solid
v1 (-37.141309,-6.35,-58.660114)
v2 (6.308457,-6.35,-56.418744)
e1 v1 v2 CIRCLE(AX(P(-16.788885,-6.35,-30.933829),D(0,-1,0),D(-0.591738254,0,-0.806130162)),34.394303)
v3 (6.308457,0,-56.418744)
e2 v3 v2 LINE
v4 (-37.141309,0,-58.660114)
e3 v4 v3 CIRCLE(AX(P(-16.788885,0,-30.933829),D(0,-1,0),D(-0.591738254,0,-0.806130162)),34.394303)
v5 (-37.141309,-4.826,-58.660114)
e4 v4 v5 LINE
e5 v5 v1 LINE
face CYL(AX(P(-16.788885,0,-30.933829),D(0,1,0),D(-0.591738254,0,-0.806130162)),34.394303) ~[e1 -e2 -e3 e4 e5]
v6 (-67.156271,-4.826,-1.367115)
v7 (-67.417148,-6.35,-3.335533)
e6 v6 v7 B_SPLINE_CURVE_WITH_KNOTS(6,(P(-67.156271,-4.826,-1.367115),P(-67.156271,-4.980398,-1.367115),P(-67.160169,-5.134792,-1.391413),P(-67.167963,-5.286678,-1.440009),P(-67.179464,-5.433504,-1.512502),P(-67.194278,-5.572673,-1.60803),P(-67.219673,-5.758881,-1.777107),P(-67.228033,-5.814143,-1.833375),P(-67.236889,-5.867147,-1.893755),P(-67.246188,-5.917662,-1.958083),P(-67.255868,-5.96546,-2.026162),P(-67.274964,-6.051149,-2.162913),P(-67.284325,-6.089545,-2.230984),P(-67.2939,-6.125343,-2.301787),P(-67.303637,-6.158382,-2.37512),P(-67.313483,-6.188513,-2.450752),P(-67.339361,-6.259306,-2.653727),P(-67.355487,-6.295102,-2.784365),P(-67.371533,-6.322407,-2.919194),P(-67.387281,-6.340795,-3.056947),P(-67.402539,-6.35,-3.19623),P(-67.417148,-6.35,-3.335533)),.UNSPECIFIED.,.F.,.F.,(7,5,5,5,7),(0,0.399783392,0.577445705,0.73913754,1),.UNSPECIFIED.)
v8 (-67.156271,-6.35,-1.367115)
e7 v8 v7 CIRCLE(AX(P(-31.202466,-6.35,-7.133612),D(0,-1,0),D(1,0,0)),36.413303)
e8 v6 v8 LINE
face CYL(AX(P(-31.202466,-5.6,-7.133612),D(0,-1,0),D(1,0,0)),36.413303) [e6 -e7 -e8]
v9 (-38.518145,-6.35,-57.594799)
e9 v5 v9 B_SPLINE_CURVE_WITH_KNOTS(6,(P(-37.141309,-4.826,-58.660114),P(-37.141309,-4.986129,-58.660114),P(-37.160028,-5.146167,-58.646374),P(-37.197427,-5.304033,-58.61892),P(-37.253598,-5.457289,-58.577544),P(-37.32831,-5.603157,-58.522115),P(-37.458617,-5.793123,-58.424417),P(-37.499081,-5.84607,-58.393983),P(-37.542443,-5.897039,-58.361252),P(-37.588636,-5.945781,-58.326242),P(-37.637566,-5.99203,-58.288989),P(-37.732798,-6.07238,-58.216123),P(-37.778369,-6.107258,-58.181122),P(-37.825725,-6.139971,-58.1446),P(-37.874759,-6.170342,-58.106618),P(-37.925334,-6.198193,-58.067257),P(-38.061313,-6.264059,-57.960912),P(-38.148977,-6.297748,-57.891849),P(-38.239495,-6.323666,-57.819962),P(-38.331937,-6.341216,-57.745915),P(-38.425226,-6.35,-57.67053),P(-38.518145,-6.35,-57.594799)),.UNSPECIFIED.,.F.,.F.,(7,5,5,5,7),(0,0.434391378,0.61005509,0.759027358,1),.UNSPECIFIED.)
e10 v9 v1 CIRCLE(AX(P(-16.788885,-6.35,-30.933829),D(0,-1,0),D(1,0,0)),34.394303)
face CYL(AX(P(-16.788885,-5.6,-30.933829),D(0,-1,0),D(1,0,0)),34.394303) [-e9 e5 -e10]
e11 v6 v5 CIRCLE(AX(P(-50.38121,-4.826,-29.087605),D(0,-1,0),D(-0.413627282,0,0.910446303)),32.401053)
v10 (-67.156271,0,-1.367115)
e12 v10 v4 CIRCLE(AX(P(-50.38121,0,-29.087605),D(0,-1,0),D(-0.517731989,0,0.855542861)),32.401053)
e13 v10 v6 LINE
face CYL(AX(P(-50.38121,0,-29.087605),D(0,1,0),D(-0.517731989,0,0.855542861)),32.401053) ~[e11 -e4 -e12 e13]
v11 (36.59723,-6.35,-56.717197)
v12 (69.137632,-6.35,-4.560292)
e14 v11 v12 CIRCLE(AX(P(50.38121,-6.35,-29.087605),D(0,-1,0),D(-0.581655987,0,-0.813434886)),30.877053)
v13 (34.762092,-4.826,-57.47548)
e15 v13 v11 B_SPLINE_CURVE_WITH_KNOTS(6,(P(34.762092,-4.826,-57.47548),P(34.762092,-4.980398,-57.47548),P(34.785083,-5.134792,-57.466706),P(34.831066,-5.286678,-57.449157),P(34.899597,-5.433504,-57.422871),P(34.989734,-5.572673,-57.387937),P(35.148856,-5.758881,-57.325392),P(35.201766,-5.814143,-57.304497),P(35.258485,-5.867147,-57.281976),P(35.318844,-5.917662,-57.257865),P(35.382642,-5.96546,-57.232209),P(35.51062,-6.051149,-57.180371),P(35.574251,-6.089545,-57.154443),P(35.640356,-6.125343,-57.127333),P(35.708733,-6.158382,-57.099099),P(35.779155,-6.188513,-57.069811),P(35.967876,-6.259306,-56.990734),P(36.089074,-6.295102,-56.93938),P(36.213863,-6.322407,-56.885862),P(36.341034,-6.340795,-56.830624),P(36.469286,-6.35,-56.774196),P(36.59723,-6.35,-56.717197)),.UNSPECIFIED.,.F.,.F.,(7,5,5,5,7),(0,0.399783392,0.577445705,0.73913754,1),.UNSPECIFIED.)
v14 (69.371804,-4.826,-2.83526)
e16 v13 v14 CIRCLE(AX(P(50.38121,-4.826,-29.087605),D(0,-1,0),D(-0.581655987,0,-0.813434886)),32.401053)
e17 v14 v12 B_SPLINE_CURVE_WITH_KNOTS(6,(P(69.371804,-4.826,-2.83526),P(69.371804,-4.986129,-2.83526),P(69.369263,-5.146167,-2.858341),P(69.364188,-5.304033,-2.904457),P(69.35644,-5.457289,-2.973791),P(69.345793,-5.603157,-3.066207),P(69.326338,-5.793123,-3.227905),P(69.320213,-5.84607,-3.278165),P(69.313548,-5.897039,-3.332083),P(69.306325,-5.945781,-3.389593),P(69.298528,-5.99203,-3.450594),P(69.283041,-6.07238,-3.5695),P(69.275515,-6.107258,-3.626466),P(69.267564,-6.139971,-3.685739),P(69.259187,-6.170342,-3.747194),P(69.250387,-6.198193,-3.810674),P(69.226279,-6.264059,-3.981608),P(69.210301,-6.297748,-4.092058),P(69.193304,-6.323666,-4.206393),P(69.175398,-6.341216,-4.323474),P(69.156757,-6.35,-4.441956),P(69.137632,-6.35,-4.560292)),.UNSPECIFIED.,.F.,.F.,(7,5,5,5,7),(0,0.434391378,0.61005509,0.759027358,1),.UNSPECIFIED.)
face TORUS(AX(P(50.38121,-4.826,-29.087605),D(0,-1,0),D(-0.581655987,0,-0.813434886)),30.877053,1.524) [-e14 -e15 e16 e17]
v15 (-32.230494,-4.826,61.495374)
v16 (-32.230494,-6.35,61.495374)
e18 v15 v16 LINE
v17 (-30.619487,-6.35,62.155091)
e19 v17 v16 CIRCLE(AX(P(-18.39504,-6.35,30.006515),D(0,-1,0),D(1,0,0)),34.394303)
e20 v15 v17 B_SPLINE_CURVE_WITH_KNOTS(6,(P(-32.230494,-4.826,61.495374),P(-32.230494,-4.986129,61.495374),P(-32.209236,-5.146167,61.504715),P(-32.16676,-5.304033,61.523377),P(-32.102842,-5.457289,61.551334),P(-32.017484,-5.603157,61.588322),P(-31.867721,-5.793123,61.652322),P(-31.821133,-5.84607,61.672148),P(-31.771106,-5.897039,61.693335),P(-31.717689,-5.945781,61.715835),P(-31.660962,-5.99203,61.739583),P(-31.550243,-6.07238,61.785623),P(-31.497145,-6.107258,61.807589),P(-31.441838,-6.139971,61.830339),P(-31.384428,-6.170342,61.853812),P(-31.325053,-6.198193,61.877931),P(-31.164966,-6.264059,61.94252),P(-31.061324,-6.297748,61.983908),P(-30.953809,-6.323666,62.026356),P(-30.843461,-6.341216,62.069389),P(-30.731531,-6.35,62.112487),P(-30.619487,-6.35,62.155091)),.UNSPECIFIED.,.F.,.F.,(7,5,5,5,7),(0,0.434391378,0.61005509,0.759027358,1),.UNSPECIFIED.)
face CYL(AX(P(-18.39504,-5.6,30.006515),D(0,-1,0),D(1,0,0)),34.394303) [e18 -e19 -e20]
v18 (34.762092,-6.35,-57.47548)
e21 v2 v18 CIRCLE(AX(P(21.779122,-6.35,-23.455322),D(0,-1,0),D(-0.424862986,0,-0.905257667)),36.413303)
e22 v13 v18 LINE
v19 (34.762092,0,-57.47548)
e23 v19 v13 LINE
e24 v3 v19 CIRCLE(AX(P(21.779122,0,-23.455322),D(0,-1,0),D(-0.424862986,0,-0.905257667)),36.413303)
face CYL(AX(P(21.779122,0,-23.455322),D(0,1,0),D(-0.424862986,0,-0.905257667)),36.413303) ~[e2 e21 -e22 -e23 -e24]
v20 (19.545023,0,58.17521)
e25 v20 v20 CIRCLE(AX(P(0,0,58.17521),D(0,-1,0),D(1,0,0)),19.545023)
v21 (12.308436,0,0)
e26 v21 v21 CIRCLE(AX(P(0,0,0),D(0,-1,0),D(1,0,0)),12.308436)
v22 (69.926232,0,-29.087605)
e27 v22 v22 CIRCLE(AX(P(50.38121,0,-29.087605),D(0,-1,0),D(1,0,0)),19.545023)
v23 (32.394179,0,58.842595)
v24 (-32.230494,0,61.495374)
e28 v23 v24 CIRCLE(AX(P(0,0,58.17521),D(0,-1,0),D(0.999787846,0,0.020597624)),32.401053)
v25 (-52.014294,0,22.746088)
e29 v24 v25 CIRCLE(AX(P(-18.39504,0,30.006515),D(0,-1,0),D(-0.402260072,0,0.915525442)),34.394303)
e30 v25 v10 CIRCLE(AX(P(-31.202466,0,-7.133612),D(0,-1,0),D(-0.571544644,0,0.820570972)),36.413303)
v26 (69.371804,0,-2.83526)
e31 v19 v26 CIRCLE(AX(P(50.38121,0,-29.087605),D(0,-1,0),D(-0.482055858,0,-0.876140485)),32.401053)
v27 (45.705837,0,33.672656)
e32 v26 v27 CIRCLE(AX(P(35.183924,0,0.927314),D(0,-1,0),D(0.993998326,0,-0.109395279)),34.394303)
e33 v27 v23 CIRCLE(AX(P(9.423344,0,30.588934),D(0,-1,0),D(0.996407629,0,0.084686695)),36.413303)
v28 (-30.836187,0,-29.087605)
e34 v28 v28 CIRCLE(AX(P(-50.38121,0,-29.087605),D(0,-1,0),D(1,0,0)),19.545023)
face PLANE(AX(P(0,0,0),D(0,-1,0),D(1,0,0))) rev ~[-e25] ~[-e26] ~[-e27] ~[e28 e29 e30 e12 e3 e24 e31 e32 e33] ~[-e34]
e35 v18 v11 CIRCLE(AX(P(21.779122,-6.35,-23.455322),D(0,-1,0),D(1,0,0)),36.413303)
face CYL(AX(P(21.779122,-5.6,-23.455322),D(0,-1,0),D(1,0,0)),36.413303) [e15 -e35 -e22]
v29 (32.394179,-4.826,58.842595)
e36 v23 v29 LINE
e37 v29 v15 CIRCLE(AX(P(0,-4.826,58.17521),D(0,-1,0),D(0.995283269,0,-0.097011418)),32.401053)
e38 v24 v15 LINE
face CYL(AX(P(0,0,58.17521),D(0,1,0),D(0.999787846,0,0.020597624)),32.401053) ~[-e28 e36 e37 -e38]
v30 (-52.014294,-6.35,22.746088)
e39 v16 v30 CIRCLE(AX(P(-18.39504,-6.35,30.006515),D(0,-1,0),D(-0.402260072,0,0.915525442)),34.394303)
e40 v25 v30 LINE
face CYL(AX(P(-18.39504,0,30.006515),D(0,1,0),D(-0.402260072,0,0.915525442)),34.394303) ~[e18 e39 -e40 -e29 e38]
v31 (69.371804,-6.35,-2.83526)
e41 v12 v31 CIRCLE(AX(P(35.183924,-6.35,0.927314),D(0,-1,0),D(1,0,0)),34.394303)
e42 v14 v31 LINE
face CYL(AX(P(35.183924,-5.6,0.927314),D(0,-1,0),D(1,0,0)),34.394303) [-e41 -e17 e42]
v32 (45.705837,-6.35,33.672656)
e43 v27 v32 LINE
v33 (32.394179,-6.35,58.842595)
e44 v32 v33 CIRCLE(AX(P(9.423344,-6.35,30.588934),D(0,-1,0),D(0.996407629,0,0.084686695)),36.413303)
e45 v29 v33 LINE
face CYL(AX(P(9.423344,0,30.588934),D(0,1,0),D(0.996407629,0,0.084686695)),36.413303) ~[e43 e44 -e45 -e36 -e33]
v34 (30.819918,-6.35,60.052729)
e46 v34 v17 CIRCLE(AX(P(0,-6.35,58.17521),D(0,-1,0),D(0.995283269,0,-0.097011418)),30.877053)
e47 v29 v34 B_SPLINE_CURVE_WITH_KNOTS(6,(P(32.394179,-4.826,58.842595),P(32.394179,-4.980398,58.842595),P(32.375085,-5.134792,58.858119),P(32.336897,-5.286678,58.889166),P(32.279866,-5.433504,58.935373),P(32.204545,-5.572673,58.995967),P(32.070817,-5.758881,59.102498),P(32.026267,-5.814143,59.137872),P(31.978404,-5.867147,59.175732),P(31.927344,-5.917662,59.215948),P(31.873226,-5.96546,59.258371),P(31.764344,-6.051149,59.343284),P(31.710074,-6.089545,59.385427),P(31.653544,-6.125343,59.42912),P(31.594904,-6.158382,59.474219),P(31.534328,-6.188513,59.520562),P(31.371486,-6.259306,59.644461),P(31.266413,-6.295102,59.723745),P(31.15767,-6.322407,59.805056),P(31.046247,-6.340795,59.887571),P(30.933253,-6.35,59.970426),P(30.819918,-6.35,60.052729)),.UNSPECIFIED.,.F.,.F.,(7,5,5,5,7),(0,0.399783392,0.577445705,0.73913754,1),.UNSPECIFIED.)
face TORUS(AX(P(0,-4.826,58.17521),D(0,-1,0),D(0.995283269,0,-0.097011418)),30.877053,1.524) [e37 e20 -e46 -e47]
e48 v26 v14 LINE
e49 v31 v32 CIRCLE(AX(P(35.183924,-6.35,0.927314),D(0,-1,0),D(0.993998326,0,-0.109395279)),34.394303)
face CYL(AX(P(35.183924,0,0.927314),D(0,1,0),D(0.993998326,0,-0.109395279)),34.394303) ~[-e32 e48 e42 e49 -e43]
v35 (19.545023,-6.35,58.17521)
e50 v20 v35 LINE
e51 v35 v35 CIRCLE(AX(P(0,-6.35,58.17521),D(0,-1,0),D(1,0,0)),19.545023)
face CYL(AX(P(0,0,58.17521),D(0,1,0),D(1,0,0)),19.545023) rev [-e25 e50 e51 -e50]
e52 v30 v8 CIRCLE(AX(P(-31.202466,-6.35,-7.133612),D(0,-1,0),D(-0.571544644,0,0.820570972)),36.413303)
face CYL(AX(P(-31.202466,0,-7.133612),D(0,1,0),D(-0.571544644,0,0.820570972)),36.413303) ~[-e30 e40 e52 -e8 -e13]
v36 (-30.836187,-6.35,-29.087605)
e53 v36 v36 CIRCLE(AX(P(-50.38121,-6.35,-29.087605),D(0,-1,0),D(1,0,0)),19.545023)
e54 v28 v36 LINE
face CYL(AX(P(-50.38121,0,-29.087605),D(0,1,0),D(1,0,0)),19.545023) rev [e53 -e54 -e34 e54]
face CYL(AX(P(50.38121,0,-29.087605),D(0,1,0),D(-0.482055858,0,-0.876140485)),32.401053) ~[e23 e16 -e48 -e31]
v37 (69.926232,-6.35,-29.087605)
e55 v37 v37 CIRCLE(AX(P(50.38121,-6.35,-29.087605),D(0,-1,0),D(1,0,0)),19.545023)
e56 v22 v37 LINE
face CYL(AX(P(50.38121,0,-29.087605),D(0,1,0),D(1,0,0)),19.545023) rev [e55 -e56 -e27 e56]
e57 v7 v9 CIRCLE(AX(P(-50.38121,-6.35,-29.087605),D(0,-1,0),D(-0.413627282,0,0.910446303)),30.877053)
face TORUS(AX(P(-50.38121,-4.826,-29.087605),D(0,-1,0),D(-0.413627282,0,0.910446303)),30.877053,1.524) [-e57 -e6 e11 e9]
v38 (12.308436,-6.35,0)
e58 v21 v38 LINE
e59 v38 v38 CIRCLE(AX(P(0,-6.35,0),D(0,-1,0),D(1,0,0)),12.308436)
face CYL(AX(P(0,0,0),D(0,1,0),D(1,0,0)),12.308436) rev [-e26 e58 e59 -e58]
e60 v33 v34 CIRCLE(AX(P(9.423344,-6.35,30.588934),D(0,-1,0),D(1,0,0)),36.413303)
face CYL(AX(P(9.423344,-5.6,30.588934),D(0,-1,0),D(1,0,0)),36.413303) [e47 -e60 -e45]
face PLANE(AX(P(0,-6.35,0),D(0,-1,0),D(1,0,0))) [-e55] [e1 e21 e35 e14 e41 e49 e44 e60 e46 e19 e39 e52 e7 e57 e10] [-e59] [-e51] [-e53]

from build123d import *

# Parameters (mm, degrees)
F0_R         = 19.5450228134
F0_R_2       = 12.3084359059
F1_DEPTH     = 6.35
F2_T4_ANGLE  = 186.4329686672
F2_S5_R      = 36.413303104
F2_T6_DEPTH  = 41
F2_S7_R      = 34.3943026377
F2_T8_DEPTH  = 41
F2_T12_ANGLE = 186.4329686672
F2_S13_R     = 36.413303104
F2_T14_DEPTH = 44
F2_S15_R     = 34.3943026377
F2_T16_DEPTH = 44
F2_T20_ANGLE = 186.4329686672
F2_S21_R     = 36.413303104
F2_T22_DEPTH = 43
F2_S23_R     = 34.3943026377
F2_T24_DEPTH = 43


# Not quite as in the source:
# - a fillet or chamfer that OpenCascade refuses, or shapes differently, is made with other operations: its cross-section is extruded or revolved along the edge and cut away or added


with BuildPart() as f1:
    # F0 (on Front) → F1 (new body)
    with BuildSketch(Plane.XZ):
        with BuildLine():
            ThreePointArc((45.7058369334, 33.6726559303), (41.6121725533, 47.6126804082), (32.3941794324, 58.8425946254))
            ThreePointArc((32.3941794324, 58.8425946254), (1.3289124245, 90.5489995431), (-32.2304944376, 61.495374328))
            ThreePointArc((-32.2304944376, 61.495374328), (-49.0277697558, 45.6463332306), (-52.0142939153, 22.7460879204))
            ThreePointArc((-52.0142939153, 22.7460879204), (-62.0398770524, 12.2308583337), (-67.1562714864, -1.3671149894))
            ThreePointArc((-67.1562714864, -1.3671149894), (-79.0821901038, -44.1236278525), (-37.1413091645, -58.6601141235))
            ThreePointArc((-37.1413091645, -58.6601141235), (-15.0169992894, -65.2824607147), (6.3084569819, -56.4187438507))
            ThreePointArc((6.3084569819, -56.4187438507), (20.4277044991, -59.8435387419), (34.7620920539, -57.4754796359))
            ThreePointArc((34.7620920539, -57.4754796359), (77.7532776793, -46.4253716906), (69.3718036021, -2.8352602045))
            ThreePointArc((69.3718036021, -2.8352602045), (64.0447690452, 19.6361274841), (45.7058369334, 33.6726559303))
        make_face()
        with Locations((-50.3812096523, -29.0876049548)):
            Circle(F0_R, mode=Mode.SUBTRACT)
        with Locations((50.3812096523, -29.0876049548)):
            Circle(F0_R, mode=Mode.SUBTRACT)
        Circle(F0_R_2, mode=Mode.SUBTRACT)
        with Locations((0, 58.1752099097)):
            Circle(F0_R, mode=Mode.SUBTRACT)
    extrude(amount=F1_DEPTH)

    # F2: fillet of radius 1.524 on 3 edges, made by hand


with BuildPart() as f2_tool2:
    # F2_s3 → F2_t4 (revolve)
    with BuildSketch(Plane(origin=(5.6170399672, 0, 57.627710491), x_dir=(0, 1, 0), z_dir=(-0.0970114178, 0, -0.9952832686))):
        with BuildLine():
            ThreePointArc((-4.826, 26.7573938379), (-5.9036307345, 26.3110245724), (-6.35, 25.2333938379))
            Line((-6.35, 25.2333938379), (-6.35, 26.7573938379))
            Line((-6.35, 26.7573938379), (-4.826, 26.7573938379))
        make_face()
    revolve(axis=Axis((0, -6.35, 58.1752099097), (0, -1, 0)), revolution_arc=F2_T4_ANGLE)

    # F2_s5 → F2_t6 (cut, symmetric)
    with BuildSketch(Plane.XZ.offset(5.6)):
        with Locations((9.423343912, 30.5889336513)):
            Circle(F2_S5_R)
    extrude(amount=F2_T6_DEPTH, both=True, mode=Mode.SUBTRACT)

    # F2_s7 → F2_t8 (cut, symmetric)
    with BuildSketch(Plane.XZ.offset(5.6)):
        with Locations((-18.3950397685, 30.0065152183)):
            Circle(F2_S7_R)
    extrude(amount=F2_T8_DEPTH, both=True, mode=Mode.SUBTRACT)


with BuildPart() as f1_1:
    add(f1.part)

    # F2_t1: cut F2_tool2
    add(f2_tool2.part, mode=Mode.SUBTRACT)


with BuildPart() as f2_tool10:
    # F2_s11 → F2_t12 (revolve)
    with BuildSketch(Plane(origin=(47.0985412635, 0, -33.6783545512), x_dir=(0, 1, 0), z_dir=(-0.8134348857, 0, 0.5816559866))):
        with BuildLine():
            ThreePointArc((-4.826, 26.7573938379), (-5.9036307345, 26.3110245724), (-6.35, 25.2333938379))
            Line((-6.35, 25.2333938379), (-6.35, 26.7573938379))
            Line((-6.35, 26.7573938379), (-4.826, 26.7573938379))
        make_face()
    revolve(axis=Axis((50.3812096523, -6.35, -29.0876049548), (0, -1, 0)), revolution_arc=F2_T12_ANGLE)

    # F2_s13 → F2_t14 (cut, symmetric)
    with BuildSketch(Plane.XZ.offset(5.6)):
        with Locations((21.7791216607, -23.4553220421)):
            Circle(F2_S13_R)
    extrude(amount=F2_T14_DEPTH, both=True, mode=Mode.SUBTRACT)

    # F2_s15 → F2_t16 (cut, symmetric)
    with BuildSketch(Plane.XZ.offset(5.6)):
        with Locations((35.1839243423, 0.927314134)):
            Circle(F2_S15_R)
    extrude(amount=F2_T16_DEPTH, both=True, mode=Mode.SUBTRACT)


with BuildPart() as f1_2:
    add(f1_1.part)

    # F2_t9: cut F2_tool10
    add(f2_tool10.part, mode=Mode.SUBTRACT)


with BuildPart() as f2_tool18:
    # F2_s19 → F2_t20 (revolve)
    with BuildSketch(Plane(origin=(-52.7155812308, 0, -23.9493559398), x_dir=(0, 1, 0), z_dir=(0.9104463035, 0, 0.4136272821))):
        with BuildLine():
            ThreePointArc((-4.826, 26.7573938379), (-5.9036307345, 26.3110245724), (-6.35, 25.2333938379))
            Line((-6.35, 25.2333938379), (-6.35, 26.7573938379))
            Line((-6.35, 26.7573938379), (-4.826, 26.7573938379))
        make_face()
    revolve(axis=Axis((-50.3812096523, -6.35, -29.0876049548), (0, -1, 0)), revolution_arc=F2_T20_ANGLE)

    # F2_s21 → F2_t22 (cut, symmetric)
    with BuildSketch(Plane.XZ.offset(5.6)):
        with Locations((-31.2024655727, -7.1336116092)):
            Circle(F2_S21_R)
    extrude(amount=F2_T22_DEPTH, both=True, mode=Mode.SUBTRACT)

    # F2_s23 → F2_t24 (cut, symmetric)
    with BuildSketch(Plane.XZ.offset(5.6)):
        with Locations((-16.7888845738, -30.9338293523)):
            Circle(F2_S23_R)
    extrude(amount=F2_T24_DEPTH, both=True, mode=Mode.SUBTRACT)


with BuildPart() as f1_3:
    add(f1_2.part)

    # F2_t17: cut F2_tool18
    add(f2_tool18.part, mode=Mode.SUBTRACT)


solid = f1_3.part
